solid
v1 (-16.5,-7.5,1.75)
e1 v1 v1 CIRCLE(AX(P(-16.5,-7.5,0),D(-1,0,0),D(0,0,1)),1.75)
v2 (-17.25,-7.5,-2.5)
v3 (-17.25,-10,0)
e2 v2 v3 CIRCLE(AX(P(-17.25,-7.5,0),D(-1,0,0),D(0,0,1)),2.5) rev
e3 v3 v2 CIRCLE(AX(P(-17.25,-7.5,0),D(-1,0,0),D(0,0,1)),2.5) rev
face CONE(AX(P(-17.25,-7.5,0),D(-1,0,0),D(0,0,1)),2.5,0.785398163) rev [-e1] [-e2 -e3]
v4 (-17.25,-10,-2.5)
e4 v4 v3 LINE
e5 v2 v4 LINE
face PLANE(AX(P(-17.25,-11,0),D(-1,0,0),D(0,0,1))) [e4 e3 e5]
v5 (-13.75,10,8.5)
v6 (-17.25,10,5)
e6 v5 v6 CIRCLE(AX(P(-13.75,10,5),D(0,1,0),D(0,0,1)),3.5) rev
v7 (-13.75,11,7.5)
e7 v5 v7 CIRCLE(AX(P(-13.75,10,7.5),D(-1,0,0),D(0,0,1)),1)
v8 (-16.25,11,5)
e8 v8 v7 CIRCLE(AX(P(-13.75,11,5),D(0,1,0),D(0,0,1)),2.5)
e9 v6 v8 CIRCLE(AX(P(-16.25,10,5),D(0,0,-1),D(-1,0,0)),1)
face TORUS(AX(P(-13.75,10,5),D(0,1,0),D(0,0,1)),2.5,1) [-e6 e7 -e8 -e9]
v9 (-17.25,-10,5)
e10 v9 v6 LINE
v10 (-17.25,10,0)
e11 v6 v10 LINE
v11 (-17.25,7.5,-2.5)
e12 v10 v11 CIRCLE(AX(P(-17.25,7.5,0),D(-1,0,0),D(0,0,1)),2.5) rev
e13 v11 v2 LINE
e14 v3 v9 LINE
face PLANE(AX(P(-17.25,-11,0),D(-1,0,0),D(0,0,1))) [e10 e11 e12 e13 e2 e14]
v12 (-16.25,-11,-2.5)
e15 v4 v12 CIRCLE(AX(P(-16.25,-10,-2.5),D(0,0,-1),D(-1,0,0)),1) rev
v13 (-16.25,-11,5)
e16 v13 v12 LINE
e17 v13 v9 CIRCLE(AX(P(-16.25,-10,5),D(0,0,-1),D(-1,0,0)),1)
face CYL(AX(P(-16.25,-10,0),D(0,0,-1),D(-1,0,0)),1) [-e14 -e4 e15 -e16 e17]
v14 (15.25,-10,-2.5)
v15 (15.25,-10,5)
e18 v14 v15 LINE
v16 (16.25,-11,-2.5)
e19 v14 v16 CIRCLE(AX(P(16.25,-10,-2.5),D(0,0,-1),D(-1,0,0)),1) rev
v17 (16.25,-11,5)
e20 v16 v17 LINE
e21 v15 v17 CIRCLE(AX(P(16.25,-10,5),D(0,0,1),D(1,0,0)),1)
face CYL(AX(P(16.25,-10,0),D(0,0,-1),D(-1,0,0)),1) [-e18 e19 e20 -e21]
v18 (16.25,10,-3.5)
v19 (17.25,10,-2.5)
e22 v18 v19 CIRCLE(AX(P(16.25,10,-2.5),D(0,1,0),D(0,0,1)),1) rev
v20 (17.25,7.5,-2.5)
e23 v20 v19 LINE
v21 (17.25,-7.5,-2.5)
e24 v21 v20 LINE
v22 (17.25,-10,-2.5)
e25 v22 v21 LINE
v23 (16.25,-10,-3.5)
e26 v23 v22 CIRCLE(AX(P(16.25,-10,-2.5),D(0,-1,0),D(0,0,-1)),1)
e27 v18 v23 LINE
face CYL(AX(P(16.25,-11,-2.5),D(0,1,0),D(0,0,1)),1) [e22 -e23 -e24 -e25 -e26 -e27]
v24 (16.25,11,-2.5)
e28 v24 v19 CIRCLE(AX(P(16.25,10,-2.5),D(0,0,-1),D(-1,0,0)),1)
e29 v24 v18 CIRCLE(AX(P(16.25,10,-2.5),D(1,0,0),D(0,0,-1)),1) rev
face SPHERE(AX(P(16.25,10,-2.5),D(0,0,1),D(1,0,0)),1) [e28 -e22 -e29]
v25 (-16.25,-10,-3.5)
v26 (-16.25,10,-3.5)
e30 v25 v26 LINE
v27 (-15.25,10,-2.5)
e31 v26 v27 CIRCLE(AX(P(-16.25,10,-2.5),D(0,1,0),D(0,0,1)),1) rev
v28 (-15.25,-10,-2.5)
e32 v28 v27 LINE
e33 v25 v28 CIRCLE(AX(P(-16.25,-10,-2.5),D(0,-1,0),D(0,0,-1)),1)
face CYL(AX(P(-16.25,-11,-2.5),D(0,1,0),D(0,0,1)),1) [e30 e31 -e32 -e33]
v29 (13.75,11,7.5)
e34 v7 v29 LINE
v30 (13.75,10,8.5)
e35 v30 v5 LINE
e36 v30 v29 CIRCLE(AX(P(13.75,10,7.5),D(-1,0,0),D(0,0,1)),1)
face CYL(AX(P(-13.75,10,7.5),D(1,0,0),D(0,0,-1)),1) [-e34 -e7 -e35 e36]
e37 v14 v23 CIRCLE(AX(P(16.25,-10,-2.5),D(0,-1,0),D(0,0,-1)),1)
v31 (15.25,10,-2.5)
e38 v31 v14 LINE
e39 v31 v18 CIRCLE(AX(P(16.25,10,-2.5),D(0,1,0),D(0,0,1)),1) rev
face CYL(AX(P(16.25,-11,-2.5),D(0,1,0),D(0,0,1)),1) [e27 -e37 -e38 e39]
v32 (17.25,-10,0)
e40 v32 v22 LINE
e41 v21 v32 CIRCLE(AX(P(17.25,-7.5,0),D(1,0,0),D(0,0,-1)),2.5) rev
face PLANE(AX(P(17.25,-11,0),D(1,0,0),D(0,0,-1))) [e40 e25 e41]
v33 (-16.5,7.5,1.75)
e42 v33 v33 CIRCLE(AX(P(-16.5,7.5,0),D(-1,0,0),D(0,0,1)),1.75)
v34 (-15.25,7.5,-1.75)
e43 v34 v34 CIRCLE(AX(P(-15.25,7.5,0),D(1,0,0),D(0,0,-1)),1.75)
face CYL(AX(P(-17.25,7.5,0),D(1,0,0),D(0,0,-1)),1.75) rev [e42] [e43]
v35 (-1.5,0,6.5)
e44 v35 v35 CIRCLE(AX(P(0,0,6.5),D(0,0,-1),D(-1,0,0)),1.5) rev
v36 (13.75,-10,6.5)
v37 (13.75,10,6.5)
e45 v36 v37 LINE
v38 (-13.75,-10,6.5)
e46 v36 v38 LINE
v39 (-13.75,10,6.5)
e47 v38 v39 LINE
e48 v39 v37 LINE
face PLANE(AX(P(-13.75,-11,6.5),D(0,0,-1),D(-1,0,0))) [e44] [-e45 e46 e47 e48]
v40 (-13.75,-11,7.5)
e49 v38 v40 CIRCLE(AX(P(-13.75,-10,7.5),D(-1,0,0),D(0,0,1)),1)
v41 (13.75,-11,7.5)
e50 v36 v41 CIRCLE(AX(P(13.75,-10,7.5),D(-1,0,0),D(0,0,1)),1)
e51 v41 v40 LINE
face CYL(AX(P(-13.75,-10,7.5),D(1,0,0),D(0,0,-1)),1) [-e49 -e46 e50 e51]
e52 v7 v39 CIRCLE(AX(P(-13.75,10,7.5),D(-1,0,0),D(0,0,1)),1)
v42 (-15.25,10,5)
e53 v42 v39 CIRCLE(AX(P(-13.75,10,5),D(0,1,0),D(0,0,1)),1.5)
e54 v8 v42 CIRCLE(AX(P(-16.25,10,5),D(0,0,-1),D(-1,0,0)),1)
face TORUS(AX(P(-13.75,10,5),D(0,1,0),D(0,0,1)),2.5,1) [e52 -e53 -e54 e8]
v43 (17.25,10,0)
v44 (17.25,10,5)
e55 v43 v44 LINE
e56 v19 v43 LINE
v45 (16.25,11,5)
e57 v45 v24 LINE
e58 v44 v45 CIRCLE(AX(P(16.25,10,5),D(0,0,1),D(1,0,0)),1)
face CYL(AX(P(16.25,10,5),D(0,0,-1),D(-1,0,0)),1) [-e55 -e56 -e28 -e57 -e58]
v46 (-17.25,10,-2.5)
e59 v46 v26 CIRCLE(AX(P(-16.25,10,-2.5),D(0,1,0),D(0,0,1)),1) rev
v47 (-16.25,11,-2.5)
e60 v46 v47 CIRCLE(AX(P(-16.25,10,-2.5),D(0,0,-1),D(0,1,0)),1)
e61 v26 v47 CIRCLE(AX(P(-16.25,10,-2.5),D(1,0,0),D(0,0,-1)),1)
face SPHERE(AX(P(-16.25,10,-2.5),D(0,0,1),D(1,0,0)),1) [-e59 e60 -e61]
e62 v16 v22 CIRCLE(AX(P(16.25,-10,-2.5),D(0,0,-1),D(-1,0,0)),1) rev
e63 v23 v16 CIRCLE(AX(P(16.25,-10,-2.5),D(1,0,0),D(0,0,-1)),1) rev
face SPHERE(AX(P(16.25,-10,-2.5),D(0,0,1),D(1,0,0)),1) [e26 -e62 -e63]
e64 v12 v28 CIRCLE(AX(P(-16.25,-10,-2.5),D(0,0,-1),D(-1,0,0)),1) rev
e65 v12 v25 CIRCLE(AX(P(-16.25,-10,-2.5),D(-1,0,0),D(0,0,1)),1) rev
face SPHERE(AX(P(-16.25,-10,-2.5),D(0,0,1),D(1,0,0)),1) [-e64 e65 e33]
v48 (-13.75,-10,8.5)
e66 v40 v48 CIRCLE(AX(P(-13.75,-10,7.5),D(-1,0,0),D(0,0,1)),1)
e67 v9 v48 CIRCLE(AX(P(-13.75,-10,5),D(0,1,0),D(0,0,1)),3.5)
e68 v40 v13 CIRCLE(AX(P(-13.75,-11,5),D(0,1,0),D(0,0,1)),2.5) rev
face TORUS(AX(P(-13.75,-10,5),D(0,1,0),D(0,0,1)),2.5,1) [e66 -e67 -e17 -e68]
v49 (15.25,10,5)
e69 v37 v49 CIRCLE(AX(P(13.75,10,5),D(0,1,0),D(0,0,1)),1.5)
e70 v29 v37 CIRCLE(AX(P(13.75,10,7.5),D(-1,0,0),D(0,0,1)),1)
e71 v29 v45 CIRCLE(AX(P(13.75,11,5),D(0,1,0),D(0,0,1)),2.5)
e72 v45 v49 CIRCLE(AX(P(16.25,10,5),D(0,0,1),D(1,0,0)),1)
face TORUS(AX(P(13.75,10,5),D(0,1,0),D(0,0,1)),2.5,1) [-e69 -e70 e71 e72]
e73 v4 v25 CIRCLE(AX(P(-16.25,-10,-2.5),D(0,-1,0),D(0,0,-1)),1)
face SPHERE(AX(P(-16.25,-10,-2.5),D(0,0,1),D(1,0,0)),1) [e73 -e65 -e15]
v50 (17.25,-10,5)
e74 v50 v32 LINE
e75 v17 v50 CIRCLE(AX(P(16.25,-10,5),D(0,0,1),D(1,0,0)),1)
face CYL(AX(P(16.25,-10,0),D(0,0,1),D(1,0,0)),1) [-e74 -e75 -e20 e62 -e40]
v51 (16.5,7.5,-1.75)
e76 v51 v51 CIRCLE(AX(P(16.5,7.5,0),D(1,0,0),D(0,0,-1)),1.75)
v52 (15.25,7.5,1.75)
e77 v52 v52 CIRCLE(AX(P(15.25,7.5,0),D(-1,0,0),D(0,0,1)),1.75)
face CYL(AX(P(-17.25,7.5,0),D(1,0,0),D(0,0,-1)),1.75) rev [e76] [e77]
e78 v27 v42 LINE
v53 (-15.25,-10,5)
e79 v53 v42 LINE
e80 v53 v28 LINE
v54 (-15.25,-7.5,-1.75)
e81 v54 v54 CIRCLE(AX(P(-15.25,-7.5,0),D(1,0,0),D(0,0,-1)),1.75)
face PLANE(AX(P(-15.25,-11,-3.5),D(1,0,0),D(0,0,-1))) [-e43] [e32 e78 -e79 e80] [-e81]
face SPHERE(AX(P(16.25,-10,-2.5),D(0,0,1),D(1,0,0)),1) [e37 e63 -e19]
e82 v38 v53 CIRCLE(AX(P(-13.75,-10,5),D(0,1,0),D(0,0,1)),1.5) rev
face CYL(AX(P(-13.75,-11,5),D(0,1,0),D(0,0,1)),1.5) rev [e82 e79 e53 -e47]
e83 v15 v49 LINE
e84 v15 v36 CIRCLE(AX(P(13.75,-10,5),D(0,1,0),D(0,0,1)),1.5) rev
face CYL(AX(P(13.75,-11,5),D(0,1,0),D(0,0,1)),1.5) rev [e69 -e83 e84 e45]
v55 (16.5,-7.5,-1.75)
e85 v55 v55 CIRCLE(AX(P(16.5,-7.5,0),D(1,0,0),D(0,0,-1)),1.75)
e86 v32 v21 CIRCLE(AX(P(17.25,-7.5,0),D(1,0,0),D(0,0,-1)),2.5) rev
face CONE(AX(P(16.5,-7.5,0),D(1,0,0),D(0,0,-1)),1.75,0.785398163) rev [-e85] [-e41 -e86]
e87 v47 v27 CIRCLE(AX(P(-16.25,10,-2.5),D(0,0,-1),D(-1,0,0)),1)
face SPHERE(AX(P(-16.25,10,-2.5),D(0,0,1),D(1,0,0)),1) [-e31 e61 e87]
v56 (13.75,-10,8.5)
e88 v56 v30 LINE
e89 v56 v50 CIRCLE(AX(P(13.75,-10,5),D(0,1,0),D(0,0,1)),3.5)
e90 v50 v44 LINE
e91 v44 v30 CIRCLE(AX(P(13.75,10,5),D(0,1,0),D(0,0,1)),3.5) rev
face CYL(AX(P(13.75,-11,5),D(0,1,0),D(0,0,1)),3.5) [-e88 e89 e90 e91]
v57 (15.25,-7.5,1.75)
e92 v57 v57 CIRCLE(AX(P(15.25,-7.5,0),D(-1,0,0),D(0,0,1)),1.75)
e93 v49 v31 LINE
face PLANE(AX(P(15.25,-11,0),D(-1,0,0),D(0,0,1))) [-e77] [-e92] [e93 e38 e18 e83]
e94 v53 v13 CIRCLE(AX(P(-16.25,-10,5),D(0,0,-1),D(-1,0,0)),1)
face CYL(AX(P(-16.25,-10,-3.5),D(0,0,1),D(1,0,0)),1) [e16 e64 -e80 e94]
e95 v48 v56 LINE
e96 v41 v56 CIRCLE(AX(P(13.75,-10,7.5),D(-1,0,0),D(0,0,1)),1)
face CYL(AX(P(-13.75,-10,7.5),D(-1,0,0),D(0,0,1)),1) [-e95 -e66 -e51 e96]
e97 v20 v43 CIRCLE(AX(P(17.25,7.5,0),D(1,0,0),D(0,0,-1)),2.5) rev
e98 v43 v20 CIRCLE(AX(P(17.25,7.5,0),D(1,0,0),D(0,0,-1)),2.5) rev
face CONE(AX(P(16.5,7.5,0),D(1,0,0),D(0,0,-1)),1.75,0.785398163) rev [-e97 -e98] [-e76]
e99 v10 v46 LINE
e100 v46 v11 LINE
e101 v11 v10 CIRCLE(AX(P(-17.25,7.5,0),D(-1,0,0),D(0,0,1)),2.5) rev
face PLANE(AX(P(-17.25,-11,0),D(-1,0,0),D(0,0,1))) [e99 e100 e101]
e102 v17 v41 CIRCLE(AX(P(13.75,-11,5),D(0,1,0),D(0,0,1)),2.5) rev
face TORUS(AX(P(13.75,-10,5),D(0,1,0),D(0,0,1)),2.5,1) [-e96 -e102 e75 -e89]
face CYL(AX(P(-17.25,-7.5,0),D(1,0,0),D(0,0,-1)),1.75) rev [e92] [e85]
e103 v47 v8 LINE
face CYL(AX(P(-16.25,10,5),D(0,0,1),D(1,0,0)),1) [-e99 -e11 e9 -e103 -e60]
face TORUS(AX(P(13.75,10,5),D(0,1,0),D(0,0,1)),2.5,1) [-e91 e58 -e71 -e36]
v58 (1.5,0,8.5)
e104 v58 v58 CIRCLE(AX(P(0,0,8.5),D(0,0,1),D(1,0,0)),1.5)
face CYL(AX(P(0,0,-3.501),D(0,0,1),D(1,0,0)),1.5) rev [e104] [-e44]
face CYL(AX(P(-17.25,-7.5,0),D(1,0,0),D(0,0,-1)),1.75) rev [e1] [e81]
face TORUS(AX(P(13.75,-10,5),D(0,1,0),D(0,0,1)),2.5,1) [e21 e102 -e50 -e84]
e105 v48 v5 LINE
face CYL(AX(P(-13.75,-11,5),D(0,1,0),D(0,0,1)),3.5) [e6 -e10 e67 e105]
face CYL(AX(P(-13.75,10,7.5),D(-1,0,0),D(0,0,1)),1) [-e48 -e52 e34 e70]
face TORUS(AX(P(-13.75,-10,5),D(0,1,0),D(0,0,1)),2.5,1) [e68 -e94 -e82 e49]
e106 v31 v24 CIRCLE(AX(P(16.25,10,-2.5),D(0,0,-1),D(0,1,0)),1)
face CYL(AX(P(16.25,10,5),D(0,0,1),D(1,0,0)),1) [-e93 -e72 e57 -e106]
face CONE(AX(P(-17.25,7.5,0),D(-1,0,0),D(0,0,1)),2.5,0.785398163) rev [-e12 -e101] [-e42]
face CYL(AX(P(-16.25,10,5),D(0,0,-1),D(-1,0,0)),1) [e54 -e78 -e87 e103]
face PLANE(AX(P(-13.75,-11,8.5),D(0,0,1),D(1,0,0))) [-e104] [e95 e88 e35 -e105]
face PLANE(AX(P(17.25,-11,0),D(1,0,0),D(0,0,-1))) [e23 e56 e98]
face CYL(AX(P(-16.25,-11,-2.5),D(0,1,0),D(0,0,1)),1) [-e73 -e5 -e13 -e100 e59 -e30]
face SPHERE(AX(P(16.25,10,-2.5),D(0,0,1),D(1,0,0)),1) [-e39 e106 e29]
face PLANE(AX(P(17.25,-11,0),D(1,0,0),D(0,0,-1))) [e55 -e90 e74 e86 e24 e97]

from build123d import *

# Parameters (mm, degrees)
BOSS_EXTRUDE1_DEPTH      = 11
BOSS_EXTRUDE1_DEPTH_BACK = 11
CUT_EXTRUDE1_DEPTH       = 23.154288524
CUT_EXTRUDE1_DEPTH_BACK  = 23.154288524
SKETCH2_R                = 1.75
CUT_EXTRUDE2_REACH       = 25.718
SKETCH3_R                = 1.5
FILLET1_R                = 1
CHAMFER1_SIZE            = 0.75


with BuildPart() as part:
    # Sketch1 → Boss-Extrude1 (new, two sides: drawn at the far end of the back side and taken through both)
    with BuildSketch(Plane(origin=(0, 0, 0), x_dir=(1, 0, 0), z_dir=(0, 1, 0)).offset(-BOSS_EXTRUDE1_DEPTH_BACK)):
        with BuildLine():
            Line((-15.25, 0), (-15.25, -5))
            ThreePointArc((-15.25, -5), (-14.810660172, -6.060660172), (-13.75, -6.5))
            Line((-13.75, -6.5), (13.75, -6.5))
            ThreePointArc((13.75, -6.5), (14.810660172, -6.060660172), (15.25, -5))
            Line((15.25, -5), (15.25, 0))
            Line((15.25, 0), (15.25, 3.5))
            Line((15.25, 3.5), (17.25, 3.5))
            Line((17.25, 3.5), (17.25, 0))
            Line((17.25, 0), (17.25, -5))
            ThreePointArc((17.25, -5), (16.224873734, -7.474873734), (13.75, -8.5))
            Line((13.75, -8.5), (-13.75, -8.5))
            ThreePointArc((-13.75, -8.5), (-16.224873734, -7.474873734), (-17.25, -5))
            Line((-17.25, -5), (-17.25, 0))
            Line((-17.25, 0), (-17.25, 3.5))
            Line((-17.25, 3.5), (-15.25, 3.5))
            Line((-15.25, 3.5), (-15.25, 0))
        make_face()
    extrude(amount=BOSS_EXTRUDE1_DEPTH + BOSS_EXTRUDE1_DEPTH_BACK)

    # Sketch2 → Cut-Extrude1 (cut, two sides: drawn at the far end of the back side and taken through both)
    with BuildSketch(Plane(origin=(0, 0, 0), x_dir=(0, 0, -1), z_dir=(1, 0, 0)).offset(-CUT_EXTRUDE1_DEPTH_BACK)):
        with Locations((0, 7.5)):
            Circle(SKETCH2_R)
        with Locations((0, -7.5)):
            Circle(SKETCH2_R)
    extrude(amount=CUT_EXTRUDE1_DEPTH + CUT_EXTRUDE1_DEPTH_BACK, mode=Mode.SUBTRACT)

    # Sketch3 → Cut-Extrude2 (cut, up to next)
    with BuildSketch(Plane.XY.offset(8.5), mode=Mode.PRIVATE) as cut_extrude2_sk1:
        Circle(SKETCH3_R)
    cut_extrude2_tool1 = extrude(cut_extrude2_sk1.sketch, amount=-CUT_EXTRUDE2_REACH, mode=Mode.PRIVATE) & part.part
    add(cut_extrude2_tool1.solids().sort_by_distance((0, 0, 8.5))[0], mode=Mode.SUBTRACT)

    # Fillet1
    fillet1_edges = [part.edges().sort_by_distance(p)[0] for p in [
        (-16.25, -11, -3.5),
        (-17.25, -11, 0.75),
        (-16.224873734, -11, 7.474873734),
        (0, -11, 8.5),
        (15.25, 0, -3.5),
        (17.25, 0, -3.5),
        (-17.25, 0, -3.5),
        (-15.25, 0, -3.5),
        (16.224873734, -11, 7.474873734),
        (17.25, -11, 0.75),
        (16.25, -11, -3.5),
        (-14.810660172, -11, 6.060660172),
        (15.25, -11, 0.75),
        (-14.810660172, 11, 6.060660172),
        (-15.25, 11, 0.75),
        (-16.25, 11, -3.5),
        (-17.25, 11, 0.75),
        (14.810660172, -11, 6.060660172),
        (-16.224873734, 11, 7.474873734),
        (0, 11, 8.5),
        (16.224873734, 11, 7.474873734),
        (17.25, 11, 0.75),
        (16.25, 11, -3.5),
        (15.25, 11, 0.75),
        (14.810660172, 11, 6.060660172),
        (0, 11, 6.5),
        (0, -11, 6.5),
        (-15.25, -11, 0.75),
    ]]
    fillet(fillet1_edges, radius=FILLET1_R - 0.0001)  # a hair under: the kernel refuses the full size

    # Chamfer1
    chamfer1_edges = [part.edges().sort_by_distance(p)[0] for p in [
        (-17.25, 7.5, 1.75),
        (17.25, 7.5, 1.75),
        (-17.25, -7.5, 1.75),
        (17.25, -7.5, 1.75),
    ]]
    chamfer(chamfer1_edges, length=CHAMFER1_SIZE)


solid = part.part
